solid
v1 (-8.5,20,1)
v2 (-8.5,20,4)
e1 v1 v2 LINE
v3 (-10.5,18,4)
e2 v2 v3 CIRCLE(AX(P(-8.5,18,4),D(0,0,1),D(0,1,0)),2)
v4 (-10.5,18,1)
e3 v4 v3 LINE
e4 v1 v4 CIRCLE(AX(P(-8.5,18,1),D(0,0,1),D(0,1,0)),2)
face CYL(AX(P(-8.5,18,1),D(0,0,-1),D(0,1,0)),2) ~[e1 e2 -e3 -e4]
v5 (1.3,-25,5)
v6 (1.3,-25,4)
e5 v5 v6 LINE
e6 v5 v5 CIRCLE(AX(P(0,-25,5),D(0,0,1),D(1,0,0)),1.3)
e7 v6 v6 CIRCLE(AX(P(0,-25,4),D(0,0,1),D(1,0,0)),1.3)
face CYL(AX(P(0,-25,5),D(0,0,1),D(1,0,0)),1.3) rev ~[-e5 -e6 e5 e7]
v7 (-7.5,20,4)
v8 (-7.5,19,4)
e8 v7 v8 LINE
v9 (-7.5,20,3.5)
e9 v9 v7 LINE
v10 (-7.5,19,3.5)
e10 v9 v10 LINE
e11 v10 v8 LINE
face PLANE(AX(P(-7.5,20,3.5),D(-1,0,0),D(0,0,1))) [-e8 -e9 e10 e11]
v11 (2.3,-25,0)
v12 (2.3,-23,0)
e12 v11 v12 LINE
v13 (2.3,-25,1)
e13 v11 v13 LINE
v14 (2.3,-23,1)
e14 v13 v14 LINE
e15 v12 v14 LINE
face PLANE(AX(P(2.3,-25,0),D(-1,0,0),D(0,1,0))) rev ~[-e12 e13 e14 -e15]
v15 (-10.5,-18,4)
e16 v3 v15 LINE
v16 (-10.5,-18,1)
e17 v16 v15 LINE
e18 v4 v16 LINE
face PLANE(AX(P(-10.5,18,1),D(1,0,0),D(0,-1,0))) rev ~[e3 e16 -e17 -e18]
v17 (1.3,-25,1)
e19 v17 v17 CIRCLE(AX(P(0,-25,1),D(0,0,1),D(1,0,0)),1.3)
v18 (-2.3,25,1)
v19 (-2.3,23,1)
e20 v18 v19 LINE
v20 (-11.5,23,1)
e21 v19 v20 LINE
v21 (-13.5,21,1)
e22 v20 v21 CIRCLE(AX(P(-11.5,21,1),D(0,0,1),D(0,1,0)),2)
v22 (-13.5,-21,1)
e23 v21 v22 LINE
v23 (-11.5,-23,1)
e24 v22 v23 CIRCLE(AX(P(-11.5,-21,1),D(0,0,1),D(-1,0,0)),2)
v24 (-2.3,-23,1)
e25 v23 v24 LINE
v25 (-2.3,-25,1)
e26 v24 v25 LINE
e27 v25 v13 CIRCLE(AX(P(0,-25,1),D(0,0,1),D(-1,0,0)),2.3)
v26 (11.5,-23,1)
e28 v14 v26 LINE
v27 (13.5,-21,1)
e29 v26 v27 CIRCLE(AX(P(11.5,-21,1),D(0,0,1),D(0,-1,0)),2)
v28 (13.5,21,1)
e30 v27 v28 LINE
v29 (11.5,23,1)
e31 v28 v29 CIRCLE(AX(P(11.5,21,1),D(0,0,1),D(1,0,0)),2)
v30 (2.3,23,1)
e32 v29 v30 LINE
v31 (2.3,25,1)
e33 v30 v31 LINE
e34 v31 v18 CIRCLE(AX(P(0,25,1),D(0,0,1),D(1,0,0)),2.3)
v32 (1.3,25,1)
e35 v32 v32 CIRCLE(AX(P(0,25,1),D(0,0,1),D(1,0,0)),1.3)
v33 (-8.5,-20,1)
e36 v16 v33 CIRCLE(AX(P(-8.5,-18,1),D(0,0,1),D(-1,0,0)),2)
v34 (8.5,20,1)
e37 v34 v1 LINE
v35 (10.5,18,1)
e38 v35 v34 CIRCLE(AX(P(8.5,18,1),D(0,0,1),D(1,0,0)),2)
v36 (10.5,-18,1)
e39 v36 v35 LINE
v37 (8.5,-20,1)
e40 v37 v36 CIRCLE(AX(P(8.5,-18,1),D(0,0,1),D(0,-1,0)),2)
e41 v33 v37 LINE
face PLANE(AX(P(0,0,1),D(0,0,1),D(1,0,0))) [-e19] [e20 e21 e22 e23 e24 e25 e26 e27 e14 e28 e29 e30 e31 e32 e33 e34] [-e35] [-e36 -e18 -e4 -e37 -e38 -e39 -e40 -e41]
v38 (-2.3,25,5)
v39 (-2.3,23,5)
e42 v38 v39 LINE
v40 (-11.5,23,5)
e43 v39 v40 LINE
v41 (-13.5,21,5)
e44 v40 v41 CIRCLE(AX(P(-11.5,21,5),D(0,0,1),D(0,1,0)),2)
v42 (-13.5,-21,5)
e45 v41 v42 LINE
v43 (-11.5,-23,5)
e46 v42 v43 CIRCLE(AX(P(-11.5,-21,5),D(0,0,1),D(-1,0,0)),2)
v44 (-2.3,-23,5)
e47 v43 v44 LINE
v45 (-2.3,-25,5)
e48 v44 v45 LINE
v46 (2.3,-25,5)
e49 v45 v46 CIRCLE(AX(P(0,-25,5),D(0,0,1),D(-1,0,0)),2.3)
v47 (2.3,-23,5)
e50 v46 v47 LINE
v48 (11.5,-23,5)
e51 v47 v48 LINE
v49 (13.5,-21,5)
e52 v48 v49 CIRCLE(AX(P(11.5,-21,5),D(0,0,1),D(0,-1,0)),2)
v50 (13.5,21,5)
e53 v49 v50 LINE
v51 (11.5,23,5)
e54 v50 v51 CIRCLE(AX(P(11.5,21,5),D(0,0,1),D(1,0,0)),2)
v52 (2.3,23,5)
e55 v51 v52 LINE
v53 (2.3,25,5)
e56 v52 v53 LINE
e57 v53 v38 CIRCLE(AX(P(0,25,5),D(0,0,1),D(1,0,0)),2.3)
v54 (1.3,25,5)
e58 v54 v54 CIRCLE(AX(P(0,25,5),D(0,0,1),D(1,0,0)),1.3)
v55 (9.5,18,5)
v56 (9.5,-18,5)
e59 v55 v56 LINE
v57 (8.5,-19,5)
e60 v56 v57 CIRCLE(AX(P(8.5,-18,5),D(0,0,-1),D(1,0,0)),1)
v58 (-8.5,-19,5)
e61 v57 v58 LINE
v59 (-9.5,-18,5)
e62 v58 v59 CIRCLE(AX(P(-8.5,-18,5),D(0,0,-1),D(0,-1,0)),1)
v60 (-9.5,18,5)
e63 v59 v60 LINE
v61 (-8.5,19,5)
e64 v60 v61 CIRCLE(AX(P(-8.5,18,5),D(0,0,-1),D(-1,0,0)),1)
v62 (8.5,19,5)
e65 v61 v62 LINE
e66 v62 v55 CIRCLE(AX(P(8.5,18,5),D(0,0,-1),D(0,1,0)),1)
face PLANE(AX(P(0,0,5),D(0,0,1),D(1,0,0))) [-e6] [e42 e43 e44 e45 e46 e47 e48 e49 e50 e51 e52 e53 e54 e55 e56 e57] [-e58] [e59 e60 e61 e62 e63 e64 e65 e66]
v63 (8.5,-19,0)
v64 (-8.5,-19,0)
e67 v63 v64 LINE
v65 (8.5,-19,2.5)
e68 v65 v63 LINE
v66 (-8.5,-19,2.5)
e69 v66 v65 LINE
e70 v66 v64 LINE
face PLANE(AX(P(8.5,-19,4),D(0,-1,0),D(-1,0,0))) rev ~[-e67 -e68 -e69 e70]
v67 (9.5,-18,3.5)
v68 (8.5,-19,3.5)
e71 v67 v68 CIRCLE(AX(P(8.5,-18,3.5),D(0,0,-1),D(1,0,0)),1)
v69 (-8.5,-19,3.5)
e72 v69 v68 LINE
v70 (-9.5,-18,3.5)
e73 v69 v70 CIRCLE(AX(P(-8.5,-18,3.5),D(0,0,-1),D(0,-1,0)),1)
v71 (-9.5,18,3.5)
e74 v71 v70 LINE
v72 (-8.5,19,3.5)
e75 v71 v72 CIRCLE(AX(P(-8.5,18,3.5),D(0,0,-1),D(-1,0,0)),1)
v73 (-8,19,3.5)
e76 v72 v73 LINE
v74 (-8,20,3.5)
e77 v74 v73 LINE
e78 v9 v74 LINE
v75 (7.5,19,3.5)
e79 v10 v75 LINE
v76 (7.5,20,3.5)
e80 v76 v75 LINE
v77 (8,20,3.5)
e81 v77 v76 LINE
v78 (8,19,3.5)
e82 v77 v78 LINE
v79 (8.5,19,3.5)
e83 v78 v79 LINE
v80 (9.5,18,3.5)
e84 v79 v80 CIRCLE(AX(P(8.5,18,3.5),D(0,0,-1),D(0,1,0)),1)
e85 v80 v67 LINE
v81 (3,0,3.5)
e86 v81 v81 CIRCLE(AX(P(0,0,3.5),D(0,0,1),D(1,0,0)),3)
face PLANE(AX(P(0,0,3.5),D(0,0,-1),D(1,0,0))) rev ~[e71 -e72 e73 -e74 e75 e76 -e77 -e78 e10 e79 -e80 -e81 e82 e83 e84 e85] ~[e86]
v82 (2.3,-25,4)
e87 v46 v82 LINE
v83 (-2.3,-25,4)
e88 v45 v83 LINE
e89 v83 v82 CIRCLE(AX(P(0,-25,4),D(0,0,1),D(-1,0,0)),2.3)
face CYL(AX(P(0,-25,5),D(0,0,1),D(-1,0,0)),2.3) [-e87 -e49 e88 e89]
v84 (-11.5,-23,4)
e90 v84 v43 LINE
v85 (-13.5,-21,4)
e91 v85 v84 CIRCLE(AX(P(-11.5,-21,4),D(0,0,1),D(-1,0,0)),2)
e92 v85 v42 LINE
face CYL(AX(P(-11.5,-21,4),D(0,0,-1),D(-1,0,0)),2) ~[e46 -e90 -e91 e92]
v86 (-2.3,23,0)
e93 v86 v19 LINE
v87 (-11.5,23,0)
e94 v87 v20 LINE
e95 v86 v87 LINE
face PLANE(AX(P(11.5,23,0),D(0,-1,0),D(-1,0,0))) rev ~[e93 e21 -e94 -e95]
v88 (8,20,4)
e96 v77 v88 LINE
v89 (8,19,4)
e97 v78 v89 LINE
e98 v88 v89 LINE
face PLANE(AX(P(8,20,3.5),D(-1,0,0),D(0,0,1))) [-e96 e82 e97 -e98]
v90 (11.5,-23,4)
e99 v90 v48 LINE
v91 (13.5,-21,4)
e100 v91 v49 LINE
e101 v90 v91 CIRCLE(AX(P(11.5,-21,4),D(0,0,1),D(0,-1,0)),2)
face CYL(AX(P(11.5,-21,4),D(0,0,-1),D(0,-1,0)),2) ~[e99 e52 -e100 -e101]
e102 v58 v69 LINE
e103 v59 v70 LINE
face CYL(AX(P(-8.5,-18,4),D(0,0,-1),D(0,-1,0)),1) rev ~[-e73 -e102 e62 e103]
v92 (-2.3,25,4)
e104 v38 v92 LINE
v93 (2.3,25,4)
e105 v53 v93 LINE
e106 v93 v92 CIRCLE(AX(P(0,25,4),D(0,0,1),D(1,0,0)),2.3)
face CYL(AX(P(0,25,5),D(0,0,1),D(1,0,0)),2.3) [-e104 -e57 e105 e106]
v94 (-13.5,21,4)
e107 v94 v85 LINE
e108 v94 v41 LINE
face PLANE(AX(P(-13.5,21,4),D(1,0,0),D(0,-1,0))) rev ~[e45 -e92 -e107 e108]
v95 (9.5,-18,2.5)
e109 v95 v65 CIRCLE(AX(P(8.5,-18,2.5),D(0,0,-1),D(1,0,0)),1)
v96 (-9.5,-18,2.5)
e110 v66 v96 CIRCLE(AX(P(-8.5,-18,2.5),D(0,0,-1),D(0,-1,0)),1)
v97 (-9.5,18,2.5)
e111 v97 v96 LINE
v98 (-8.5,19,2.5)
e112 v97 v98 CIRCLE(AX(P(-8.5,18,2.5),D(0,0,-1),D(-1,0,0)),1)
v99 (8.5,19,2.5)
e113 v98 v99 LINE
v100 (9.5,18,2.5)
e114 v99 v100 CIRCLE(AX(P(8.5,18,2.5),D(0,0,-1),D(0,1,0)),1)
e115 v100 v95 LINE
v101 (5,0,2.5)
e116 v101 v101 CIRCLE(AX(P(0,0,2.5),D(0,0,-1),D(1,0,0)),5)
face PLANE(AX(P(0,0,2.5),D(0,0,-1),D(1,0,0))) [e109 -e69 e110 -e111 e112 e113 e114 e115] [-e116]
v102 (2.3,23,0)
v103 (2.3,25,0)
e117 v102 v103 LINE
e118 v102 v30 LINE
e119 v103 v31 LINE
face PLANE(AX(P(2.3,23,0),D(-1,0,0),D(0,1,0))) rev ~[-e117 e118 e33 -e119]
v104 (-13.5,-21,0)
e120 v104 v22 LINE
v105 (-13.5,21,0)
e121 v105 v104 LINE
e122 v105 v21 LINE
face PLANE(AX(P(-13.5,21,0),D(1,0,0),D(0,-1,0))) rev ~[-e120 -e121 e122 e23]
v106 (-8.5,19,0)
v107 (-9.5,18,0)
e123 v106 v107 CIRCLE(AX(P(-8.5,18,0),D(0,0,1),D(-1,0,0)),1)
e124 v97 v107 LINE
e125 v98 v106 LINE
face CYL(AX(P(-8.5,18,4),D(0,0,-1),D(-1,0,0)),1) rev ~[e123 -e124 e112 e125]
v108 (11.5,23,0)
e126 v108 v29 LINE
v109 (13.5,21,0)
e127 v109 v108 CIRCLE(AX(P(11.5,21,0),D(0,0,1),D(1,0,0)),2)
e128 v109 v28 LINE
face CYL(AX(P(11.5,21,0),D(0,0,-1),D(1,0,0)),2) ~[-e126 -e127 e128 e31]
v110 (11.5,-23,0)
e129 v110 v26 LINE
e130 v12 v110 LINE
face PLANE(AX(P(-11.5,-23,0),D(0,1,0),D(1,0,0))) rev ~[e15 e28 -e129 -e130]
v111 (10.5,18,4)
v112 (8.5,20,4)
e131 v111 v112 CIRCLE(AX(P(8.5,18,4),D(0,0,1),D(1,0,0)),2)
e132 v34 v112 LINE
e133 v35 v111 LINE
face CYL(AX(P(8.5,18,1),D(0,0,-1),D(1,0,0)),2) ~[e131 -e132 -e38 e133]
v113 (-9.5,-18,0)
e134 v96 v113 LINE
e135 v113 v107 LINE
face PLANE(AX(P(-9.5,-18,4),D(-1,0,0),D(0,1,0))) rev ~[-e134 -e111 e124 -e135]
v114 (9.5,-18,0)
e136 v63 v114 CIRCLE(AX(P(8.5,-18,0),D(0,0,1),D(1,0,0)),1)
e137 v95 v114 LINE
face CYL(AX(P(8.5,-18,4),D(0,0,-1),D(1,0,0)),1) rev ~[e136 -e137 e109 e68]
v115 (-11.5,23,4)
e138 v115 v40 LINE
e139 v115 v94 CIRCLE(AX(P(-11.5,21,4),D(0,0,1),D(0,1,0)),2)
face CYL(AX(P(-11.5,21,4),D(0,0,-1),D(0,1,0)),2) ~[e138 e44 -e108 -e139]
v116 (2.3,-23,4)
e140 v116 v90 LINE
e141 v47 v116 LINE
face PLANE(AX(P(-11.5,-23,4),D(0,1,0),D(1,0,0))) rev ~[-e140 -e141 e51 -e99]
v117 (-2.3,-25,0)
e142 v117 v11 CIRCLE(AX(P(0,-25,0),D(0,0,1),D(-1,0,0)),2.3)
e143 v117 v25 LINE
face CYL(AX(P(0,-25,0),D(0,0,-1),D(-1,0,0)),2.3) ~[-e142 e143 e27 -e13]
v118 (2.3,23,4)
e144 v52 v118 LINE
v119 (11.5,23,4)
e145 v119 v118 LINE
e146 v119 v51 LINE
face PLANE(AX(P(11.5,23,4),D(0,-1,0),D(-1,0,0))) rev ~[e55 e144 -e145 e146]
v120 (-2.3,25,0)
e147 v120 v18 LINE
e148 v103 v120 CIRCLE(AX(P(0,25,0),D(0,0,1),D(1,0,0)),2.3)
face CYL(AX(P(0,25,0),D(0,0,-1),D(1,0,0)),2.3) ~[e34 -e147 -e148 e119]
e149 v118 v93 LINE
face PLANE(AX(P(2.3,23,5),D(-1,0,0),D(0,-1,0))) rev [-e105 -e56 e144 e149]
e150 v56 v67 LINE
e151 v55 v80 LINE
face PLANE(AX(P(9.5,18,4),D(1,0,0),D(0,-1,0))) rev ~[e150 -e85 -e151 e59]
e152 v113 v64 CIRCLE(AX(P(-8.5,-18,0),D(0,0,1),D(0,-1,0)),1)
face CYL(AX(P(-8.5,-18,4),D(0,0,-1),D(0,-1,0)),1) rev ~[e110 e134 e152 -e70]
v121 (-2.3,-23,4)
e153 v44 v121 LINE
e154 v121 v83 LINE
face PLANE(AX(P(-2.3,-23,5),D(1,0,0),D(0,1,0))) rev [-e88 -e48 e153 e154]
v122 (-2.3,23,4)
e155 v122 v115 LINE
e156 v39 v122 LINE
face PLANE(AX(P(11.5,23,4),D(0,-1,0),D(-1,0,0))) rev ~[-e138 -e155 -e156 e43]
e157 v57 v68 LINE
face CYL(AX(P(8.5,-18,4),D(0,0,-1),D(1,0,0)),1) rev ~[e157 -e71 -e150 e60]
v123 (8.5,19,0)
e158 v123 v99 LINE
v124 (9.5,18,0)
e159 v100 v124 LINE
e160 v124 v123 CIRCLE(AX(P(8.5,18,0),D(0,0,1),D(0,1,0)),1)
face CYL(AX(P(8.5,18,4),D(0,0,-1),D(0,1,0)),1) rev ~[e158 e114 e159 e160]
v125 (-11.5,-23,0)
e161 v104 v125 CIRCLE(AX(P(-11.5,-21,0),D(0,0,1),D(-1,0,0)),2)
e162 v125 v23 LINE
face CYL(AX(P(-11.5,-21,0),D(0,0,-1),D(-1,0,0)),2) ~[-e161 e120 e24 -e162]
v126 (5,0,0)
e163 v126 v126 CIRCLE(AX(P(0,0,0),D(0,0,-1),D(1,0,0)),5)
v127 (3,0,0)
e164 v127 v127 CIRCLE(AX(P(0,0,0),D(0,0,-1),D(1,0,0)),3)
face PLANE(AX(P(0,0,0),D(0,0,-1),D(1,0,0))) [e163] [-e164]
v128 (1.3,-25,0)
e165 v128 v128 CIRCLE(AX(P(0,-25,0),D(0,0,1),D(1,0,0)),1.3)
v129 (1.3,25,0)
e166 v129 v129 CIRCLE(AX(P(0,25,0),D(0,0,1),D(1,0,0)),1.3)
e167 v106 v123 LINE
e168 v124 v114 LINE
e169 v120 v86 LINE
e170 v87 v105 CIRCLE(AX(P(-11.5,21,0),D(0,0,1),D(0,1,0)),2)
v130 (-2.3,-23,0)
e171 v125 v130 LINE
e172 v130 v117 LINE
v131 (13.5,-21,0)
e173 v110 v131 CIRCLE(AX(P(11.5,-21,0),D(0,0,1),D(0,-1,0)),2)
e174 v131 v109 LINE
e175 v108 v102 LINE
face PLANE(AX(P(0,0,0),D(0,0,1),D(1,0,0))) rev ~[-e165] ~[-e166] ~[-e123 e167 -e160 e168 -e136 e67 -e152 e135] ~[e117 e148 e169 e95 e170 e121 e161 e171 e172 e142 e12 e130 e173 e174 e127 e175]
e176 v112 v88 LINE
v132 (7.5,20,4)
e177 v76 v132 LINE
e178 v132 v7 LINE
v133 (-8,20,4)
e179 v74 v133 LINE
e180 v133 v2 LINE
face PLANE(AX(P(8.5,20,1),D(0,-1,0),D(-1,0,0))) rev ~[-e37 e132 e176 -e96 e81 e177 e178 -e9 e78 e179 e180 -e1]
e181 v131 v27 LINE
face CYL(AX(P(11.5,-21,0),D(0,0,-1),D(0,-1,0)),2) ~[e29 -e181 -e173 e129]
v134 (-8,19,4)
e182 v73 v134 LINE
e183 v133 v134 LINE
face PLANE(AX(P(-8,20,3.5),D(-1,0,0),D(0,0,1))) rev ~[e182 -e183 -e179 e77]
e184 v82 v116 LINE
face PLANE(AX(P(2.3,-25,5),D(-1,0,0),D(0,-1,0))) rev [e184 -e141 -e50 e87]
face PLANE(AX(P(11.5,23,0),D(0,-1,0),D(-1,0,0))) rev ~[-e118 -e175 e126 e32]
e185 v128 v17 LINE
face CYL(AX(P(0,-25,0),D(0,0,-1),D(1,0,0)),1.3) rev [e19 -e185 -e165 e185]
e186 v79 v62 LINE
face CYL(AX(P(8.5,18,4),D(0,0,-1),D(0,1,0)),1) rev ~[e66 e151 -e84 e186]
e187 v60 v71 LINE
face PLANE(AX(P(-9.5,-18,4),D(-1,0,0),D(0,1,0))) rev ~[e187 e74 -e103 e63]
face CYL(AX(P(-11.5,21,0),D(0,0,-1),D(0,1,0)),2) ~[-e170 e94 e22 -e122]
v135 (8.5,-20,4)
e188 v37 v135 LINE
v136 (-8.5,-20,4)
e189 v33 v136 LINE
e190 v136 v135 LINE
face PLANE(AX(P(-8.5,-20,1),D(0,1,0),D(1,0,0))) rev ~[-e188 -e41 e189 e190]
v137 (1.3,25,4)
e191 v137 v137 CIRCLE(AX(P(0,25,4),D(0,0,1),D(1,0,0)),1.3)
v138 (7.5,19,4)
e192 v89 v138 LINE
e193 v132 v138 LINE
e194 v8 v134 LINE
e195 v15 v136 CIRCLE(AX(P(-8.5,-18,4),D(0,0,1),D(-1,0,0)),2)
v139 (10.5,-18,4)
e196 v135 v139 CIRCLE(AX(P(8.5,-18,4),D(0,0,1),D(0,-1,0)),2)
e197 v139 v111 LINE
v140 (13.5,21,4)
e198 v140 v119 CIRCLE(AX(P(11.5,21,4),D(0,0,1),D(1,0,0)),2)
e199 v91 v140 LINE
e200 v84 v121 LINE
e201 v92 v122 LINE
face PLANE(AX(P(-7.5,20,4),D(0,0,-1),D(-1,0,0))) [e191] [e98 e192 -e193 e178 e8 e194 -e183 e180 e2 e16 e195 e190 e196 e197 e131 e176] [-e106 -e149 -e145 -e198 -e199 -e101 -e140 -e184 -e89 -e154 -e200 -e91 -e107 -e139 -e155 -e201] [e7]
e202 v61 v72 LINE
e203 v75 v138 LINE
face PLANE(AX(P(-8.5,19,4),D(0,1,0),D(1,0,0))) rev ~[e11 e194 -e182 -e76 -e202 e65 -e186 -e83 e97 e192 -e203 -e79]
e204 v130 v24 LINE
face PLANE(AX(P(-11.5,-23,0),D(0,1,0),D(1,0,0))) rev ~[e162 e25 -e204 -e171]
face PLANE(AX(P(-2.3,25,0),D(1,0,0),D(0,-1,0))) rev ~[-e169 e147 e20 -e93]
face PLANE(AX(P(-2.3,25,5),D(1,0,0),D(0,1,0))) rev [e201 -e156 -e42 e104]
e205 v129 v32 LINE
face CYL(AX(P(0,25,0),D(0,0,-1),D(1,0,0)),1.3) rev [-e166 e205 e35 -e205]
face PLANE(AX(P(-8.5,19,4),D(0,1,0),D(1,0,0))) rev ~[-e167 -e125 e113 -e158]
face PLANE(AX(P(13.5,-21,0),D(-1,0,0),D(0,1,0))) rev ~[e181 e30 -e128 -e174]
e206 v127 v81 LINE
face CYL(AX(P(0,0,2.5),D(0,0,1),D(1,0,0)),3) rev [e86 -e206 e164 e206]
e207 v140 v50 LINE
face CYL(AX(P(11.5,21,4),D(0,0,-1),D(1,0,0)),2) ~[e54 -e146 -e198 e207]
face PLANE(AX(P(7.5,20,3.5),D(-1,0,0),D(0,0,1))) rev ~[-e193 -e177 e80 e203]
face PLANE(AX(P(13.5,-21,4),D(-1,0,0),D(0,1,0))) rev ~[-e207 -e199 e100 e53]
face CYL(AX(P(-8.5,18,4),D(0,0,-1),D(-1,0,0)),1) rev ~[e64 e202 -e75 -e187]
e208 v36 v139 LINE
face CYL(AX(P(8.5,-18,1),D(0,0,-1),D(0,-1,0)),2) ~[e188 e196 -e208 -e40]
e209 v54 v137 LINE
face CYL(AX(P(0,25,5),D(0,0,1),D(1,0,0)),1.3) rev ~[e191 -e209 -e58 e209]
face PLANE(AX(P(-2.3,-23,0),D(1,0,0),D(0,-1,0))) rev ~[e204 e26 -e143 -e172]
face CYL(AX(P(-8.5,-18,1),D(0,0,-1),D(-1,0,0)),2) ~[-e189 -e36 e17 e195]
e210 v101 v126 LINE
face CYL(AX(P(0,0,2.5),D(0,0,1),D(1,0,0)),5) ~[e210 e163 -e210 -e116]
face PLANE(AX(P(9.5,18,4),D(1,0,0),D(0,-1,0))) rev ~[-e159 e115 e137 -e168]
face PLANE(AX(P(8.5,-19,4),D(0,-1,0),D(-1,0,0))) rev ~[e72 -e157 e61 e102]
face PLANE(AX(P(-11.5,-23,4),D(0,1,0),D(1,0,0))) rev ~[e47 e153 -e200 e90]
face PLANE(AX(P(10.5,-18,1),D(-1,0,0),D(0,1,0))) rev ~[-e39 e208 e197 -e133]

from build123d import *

# Parameters (mm, degrees)
F1_DEPTH  = 1
F3_DEPTH  = 3
F4_DEPTH  = 1.001
F6_DEPTH  = 1
F7_R      = 1.3
F8_DEPTH  = 1
F10_W     = 19
F10_H     = 38
F11_DEPTH = 1
F12_R     = 3
F13_DEPTH = 25
F14_R     = 5
F14_R_2   = 3
F15_DEPTH = 2.5
F16_W     = 0.5
F16_H     = 0.5
F17_DEPTH = 5


# Not quite as in the source:
# - a pattern or mirror of a feature is missing from the dataset's text; its kind, count and spacing are read off the source's solid


with BuildPart() as f1:
    # F0 (on Top) → F1 (new body)
    with BuildSketch(Plane.XY):
        with BuildLine():
            ThreePointArc((13.5, 21), (12.9142135624, 22.4142135624), (11.5, 23))
            Line((11.5, 23), (-11.5, 23))
            ThreePointArc((-11.5, 23), (-12.9142135624, 22.4142135624), (-13.5, 21))
            Line((-13.5, 21), (-13.5, -21))
            ThreePointArc((-13.5, -21), (-12.9142135624, -22.4142135624), (-11.5, -23))
            Line((-11.5, -23), (11.5, -23))
            ThreePointArc((11.5, -23), (12.9142135624, -22.4142135624), (13.5, -21))
            Line((13.5, -21), (13.5, 21))
        make_face()
    extrude(amount=F1_DEPTH)

    # F2 (on face) → F3 (join)
    with BuildSketch(Plane.XY.offset(1)):
        with BuildLine():
            ThreePointArc((10.5, 18), (9.9142135624, 19.4142135624), (8.5, 20))
            Line((8.5, 20), (-8.5, 20))
            ThreePointArc((-8.5, 20), (-9.9142135624, 19.4142135624), (-10.5, 18))
            Line((-10.5, 18), (-10.5, -18))
            ThreePointArc((-10.5, -18), (-9.9142135624, -19.4142135624), (-8.5, -20))
            Line((-8.5, -20), (8.5, -20))
            ThreePointArc((8.5, -20), (9.9142135624, -19.4142135624), (10.5, -18))
            Line((10.5, -18), (10.5, 18))
        make_face()
        with BuildLine():
            ThreePointArc((8.5, 19), (9.2071067812, 18.7071067812), (9.5, 18))
            Line((9.5, 18), (9.5, -18))
            ThreePointArc((9.5, -18), (9.2071067812, -18.7071067812), (8.5, -19))
            Line((8.5, -19), (-8.5, -19))
            ThreePointArc((-8.5, -19), (-9.2071067812, -18.7071067812), (-9.5, -18))
            Line((-9.5, -18), (-9.5, 18))
            ThreePointArc((-9.5, 18), (-9.2071067812, 18.7071067812), (-8.5, 19))
            Line((-8.5, 19), (8.5, 19))
        make_face(mode=Mode.SUBTRACT)
    extrude(amount=F3_DEPTH)

    # F4 (cut, through all): a face of the model
    f4_faces = [f1.faces().sort_by_distance(p)[0] for p in [
        (0, 0, 1),
    ]]
    extrude(f4_faces, amount=-F4_DEPTH, mode=Mode.SUBTRACT)

    # F5 (on face) → F6 (join)
    with BuildSketch(Plane.XY.offset(4)):
        with BuildLine():
            Line((13.5, -21), (13.5, 21))
            ThreePointArc((13.5, 21), (12.9142135624, 22.4142135624), (11.5, 23))
            Line((11.5, 23), (-11.5, 23))
            ThreePointArc((-11.5, 23), (-12.9142135624, 22.4142135624), (-13.5, 21))
            Line((-13.5, 21), (-13.5, -21))
            ThreePointArc((-13.5, -21), (-12.9142135624, -22.4142135624), (-11.5, -23))
            Line((-11.5, -23), (11.5, -23))
            ThreePointArc((11.5, -23), (12.9142135624, -22.4142135624), (13.5, -21))
        make_face()
        with BuildLine():
            ThreePointArc((8.5, 19), (9.2071067812, 18.7071067812), (9.5, 18))
            Line((9.5, 18), (9.5, -18))
            ThreePointArc((9.5, -18), (9.2071067812, -18.7071067812), (8.5, -19))
            Line((8.5, -19), (-8.5, -19))
            ThreePointArc((-8.5, -19), (-9.2071067812, -18.7071067812), (-9.5, -18))
            Line((-9.5, -18), (-9.5, 18))
            ThreePointArc((-9.5, 18), (-9.2071067812, 18.7071067812), (-8.5, 19))
            Line((-8.5, 19), (8.5, 19))
        make_face(mode=Mode.SUBTRACT)
    extrude(amount=F6_DEPTH)

    # F7 (on Top) → F8 (join)
    with BuildSketch(Plane.XY):
        with BuildLine():
            Line((2.3, 23), (2.3, 25))
            ThreePointArc((2.3, 25), (0, 27.3), (-2.3, 25))
            Line((-2.3, 25), (-2.3, 23))
            Line((-2.3, 23), (2.3, 23))
        make_face()
        with Locations((0, 25)):
            Circle(F7_R, mode=Mode.SUBTRACT)
        with BuildLine():
            ThreePointArc((-2.3, -25), (0, -27.3), (2.3, -25))
            Line((2.3, -25), (2.3, -23))
            Line((2.3, -23), (-2.3, -23))
            Line((-2.3, -23), (-2.3, -25))
        make_face()
        with Locations((0, -25)):
            Circle(F7_R, mode=Mode.SUBTRACT)
    f8 = extrude(amount=F8_DEPTH)

    # F8_copies: F8 across plane
    add(f8.mirror(Plane.XY.offset(2.5)))

    # F10 (on mid) → F11 (join)
    with BuildSketch(Plane(origin=(0, 0, 2.5), x_dir=(1, 0, 0), z_dir=(0, 0, -1))):
        Rectangle(F10_W, F10_H)
    extrude(amount=-F11_DEPTH)

    # F12 (on face) → F13 (cut)
    with BuildSketch(Plane.XY.offset(3.5)):
        Circle(F12_R)
    extrude(amount=-F13_DEPTH, mode=Mode.SUBTRACT)

    # F14 (on face) → F15 (join, through all)
    with BuildSketch(Plane(origin=(0, 0, 2.5), x_dir=(1, 0, 0), z_dir=(0, 0, -1))):
        Circle(F14_R)
        Circle(F14_R_2, mode=Mode.SUBTRACT)
    extrude(amount=F15_DEPTH)

    # F16 (on face) → F17 (cut)
    with BuildSketch(Plane(origin=(0, 20, 0), x_dir=(-1, 0, 0), z_dir=(0, 1, 0))):
        with Locations((-7.75, 3.75)):
            Rectangle(F16_W, F16_H)
        with Locations((7.75, 3.75)):
            Rectangle(F16_W, F16_H)
    extrude(amount=-F17_DEPTH, mode=Mode.SUBTRACT)


solid = f1.part
